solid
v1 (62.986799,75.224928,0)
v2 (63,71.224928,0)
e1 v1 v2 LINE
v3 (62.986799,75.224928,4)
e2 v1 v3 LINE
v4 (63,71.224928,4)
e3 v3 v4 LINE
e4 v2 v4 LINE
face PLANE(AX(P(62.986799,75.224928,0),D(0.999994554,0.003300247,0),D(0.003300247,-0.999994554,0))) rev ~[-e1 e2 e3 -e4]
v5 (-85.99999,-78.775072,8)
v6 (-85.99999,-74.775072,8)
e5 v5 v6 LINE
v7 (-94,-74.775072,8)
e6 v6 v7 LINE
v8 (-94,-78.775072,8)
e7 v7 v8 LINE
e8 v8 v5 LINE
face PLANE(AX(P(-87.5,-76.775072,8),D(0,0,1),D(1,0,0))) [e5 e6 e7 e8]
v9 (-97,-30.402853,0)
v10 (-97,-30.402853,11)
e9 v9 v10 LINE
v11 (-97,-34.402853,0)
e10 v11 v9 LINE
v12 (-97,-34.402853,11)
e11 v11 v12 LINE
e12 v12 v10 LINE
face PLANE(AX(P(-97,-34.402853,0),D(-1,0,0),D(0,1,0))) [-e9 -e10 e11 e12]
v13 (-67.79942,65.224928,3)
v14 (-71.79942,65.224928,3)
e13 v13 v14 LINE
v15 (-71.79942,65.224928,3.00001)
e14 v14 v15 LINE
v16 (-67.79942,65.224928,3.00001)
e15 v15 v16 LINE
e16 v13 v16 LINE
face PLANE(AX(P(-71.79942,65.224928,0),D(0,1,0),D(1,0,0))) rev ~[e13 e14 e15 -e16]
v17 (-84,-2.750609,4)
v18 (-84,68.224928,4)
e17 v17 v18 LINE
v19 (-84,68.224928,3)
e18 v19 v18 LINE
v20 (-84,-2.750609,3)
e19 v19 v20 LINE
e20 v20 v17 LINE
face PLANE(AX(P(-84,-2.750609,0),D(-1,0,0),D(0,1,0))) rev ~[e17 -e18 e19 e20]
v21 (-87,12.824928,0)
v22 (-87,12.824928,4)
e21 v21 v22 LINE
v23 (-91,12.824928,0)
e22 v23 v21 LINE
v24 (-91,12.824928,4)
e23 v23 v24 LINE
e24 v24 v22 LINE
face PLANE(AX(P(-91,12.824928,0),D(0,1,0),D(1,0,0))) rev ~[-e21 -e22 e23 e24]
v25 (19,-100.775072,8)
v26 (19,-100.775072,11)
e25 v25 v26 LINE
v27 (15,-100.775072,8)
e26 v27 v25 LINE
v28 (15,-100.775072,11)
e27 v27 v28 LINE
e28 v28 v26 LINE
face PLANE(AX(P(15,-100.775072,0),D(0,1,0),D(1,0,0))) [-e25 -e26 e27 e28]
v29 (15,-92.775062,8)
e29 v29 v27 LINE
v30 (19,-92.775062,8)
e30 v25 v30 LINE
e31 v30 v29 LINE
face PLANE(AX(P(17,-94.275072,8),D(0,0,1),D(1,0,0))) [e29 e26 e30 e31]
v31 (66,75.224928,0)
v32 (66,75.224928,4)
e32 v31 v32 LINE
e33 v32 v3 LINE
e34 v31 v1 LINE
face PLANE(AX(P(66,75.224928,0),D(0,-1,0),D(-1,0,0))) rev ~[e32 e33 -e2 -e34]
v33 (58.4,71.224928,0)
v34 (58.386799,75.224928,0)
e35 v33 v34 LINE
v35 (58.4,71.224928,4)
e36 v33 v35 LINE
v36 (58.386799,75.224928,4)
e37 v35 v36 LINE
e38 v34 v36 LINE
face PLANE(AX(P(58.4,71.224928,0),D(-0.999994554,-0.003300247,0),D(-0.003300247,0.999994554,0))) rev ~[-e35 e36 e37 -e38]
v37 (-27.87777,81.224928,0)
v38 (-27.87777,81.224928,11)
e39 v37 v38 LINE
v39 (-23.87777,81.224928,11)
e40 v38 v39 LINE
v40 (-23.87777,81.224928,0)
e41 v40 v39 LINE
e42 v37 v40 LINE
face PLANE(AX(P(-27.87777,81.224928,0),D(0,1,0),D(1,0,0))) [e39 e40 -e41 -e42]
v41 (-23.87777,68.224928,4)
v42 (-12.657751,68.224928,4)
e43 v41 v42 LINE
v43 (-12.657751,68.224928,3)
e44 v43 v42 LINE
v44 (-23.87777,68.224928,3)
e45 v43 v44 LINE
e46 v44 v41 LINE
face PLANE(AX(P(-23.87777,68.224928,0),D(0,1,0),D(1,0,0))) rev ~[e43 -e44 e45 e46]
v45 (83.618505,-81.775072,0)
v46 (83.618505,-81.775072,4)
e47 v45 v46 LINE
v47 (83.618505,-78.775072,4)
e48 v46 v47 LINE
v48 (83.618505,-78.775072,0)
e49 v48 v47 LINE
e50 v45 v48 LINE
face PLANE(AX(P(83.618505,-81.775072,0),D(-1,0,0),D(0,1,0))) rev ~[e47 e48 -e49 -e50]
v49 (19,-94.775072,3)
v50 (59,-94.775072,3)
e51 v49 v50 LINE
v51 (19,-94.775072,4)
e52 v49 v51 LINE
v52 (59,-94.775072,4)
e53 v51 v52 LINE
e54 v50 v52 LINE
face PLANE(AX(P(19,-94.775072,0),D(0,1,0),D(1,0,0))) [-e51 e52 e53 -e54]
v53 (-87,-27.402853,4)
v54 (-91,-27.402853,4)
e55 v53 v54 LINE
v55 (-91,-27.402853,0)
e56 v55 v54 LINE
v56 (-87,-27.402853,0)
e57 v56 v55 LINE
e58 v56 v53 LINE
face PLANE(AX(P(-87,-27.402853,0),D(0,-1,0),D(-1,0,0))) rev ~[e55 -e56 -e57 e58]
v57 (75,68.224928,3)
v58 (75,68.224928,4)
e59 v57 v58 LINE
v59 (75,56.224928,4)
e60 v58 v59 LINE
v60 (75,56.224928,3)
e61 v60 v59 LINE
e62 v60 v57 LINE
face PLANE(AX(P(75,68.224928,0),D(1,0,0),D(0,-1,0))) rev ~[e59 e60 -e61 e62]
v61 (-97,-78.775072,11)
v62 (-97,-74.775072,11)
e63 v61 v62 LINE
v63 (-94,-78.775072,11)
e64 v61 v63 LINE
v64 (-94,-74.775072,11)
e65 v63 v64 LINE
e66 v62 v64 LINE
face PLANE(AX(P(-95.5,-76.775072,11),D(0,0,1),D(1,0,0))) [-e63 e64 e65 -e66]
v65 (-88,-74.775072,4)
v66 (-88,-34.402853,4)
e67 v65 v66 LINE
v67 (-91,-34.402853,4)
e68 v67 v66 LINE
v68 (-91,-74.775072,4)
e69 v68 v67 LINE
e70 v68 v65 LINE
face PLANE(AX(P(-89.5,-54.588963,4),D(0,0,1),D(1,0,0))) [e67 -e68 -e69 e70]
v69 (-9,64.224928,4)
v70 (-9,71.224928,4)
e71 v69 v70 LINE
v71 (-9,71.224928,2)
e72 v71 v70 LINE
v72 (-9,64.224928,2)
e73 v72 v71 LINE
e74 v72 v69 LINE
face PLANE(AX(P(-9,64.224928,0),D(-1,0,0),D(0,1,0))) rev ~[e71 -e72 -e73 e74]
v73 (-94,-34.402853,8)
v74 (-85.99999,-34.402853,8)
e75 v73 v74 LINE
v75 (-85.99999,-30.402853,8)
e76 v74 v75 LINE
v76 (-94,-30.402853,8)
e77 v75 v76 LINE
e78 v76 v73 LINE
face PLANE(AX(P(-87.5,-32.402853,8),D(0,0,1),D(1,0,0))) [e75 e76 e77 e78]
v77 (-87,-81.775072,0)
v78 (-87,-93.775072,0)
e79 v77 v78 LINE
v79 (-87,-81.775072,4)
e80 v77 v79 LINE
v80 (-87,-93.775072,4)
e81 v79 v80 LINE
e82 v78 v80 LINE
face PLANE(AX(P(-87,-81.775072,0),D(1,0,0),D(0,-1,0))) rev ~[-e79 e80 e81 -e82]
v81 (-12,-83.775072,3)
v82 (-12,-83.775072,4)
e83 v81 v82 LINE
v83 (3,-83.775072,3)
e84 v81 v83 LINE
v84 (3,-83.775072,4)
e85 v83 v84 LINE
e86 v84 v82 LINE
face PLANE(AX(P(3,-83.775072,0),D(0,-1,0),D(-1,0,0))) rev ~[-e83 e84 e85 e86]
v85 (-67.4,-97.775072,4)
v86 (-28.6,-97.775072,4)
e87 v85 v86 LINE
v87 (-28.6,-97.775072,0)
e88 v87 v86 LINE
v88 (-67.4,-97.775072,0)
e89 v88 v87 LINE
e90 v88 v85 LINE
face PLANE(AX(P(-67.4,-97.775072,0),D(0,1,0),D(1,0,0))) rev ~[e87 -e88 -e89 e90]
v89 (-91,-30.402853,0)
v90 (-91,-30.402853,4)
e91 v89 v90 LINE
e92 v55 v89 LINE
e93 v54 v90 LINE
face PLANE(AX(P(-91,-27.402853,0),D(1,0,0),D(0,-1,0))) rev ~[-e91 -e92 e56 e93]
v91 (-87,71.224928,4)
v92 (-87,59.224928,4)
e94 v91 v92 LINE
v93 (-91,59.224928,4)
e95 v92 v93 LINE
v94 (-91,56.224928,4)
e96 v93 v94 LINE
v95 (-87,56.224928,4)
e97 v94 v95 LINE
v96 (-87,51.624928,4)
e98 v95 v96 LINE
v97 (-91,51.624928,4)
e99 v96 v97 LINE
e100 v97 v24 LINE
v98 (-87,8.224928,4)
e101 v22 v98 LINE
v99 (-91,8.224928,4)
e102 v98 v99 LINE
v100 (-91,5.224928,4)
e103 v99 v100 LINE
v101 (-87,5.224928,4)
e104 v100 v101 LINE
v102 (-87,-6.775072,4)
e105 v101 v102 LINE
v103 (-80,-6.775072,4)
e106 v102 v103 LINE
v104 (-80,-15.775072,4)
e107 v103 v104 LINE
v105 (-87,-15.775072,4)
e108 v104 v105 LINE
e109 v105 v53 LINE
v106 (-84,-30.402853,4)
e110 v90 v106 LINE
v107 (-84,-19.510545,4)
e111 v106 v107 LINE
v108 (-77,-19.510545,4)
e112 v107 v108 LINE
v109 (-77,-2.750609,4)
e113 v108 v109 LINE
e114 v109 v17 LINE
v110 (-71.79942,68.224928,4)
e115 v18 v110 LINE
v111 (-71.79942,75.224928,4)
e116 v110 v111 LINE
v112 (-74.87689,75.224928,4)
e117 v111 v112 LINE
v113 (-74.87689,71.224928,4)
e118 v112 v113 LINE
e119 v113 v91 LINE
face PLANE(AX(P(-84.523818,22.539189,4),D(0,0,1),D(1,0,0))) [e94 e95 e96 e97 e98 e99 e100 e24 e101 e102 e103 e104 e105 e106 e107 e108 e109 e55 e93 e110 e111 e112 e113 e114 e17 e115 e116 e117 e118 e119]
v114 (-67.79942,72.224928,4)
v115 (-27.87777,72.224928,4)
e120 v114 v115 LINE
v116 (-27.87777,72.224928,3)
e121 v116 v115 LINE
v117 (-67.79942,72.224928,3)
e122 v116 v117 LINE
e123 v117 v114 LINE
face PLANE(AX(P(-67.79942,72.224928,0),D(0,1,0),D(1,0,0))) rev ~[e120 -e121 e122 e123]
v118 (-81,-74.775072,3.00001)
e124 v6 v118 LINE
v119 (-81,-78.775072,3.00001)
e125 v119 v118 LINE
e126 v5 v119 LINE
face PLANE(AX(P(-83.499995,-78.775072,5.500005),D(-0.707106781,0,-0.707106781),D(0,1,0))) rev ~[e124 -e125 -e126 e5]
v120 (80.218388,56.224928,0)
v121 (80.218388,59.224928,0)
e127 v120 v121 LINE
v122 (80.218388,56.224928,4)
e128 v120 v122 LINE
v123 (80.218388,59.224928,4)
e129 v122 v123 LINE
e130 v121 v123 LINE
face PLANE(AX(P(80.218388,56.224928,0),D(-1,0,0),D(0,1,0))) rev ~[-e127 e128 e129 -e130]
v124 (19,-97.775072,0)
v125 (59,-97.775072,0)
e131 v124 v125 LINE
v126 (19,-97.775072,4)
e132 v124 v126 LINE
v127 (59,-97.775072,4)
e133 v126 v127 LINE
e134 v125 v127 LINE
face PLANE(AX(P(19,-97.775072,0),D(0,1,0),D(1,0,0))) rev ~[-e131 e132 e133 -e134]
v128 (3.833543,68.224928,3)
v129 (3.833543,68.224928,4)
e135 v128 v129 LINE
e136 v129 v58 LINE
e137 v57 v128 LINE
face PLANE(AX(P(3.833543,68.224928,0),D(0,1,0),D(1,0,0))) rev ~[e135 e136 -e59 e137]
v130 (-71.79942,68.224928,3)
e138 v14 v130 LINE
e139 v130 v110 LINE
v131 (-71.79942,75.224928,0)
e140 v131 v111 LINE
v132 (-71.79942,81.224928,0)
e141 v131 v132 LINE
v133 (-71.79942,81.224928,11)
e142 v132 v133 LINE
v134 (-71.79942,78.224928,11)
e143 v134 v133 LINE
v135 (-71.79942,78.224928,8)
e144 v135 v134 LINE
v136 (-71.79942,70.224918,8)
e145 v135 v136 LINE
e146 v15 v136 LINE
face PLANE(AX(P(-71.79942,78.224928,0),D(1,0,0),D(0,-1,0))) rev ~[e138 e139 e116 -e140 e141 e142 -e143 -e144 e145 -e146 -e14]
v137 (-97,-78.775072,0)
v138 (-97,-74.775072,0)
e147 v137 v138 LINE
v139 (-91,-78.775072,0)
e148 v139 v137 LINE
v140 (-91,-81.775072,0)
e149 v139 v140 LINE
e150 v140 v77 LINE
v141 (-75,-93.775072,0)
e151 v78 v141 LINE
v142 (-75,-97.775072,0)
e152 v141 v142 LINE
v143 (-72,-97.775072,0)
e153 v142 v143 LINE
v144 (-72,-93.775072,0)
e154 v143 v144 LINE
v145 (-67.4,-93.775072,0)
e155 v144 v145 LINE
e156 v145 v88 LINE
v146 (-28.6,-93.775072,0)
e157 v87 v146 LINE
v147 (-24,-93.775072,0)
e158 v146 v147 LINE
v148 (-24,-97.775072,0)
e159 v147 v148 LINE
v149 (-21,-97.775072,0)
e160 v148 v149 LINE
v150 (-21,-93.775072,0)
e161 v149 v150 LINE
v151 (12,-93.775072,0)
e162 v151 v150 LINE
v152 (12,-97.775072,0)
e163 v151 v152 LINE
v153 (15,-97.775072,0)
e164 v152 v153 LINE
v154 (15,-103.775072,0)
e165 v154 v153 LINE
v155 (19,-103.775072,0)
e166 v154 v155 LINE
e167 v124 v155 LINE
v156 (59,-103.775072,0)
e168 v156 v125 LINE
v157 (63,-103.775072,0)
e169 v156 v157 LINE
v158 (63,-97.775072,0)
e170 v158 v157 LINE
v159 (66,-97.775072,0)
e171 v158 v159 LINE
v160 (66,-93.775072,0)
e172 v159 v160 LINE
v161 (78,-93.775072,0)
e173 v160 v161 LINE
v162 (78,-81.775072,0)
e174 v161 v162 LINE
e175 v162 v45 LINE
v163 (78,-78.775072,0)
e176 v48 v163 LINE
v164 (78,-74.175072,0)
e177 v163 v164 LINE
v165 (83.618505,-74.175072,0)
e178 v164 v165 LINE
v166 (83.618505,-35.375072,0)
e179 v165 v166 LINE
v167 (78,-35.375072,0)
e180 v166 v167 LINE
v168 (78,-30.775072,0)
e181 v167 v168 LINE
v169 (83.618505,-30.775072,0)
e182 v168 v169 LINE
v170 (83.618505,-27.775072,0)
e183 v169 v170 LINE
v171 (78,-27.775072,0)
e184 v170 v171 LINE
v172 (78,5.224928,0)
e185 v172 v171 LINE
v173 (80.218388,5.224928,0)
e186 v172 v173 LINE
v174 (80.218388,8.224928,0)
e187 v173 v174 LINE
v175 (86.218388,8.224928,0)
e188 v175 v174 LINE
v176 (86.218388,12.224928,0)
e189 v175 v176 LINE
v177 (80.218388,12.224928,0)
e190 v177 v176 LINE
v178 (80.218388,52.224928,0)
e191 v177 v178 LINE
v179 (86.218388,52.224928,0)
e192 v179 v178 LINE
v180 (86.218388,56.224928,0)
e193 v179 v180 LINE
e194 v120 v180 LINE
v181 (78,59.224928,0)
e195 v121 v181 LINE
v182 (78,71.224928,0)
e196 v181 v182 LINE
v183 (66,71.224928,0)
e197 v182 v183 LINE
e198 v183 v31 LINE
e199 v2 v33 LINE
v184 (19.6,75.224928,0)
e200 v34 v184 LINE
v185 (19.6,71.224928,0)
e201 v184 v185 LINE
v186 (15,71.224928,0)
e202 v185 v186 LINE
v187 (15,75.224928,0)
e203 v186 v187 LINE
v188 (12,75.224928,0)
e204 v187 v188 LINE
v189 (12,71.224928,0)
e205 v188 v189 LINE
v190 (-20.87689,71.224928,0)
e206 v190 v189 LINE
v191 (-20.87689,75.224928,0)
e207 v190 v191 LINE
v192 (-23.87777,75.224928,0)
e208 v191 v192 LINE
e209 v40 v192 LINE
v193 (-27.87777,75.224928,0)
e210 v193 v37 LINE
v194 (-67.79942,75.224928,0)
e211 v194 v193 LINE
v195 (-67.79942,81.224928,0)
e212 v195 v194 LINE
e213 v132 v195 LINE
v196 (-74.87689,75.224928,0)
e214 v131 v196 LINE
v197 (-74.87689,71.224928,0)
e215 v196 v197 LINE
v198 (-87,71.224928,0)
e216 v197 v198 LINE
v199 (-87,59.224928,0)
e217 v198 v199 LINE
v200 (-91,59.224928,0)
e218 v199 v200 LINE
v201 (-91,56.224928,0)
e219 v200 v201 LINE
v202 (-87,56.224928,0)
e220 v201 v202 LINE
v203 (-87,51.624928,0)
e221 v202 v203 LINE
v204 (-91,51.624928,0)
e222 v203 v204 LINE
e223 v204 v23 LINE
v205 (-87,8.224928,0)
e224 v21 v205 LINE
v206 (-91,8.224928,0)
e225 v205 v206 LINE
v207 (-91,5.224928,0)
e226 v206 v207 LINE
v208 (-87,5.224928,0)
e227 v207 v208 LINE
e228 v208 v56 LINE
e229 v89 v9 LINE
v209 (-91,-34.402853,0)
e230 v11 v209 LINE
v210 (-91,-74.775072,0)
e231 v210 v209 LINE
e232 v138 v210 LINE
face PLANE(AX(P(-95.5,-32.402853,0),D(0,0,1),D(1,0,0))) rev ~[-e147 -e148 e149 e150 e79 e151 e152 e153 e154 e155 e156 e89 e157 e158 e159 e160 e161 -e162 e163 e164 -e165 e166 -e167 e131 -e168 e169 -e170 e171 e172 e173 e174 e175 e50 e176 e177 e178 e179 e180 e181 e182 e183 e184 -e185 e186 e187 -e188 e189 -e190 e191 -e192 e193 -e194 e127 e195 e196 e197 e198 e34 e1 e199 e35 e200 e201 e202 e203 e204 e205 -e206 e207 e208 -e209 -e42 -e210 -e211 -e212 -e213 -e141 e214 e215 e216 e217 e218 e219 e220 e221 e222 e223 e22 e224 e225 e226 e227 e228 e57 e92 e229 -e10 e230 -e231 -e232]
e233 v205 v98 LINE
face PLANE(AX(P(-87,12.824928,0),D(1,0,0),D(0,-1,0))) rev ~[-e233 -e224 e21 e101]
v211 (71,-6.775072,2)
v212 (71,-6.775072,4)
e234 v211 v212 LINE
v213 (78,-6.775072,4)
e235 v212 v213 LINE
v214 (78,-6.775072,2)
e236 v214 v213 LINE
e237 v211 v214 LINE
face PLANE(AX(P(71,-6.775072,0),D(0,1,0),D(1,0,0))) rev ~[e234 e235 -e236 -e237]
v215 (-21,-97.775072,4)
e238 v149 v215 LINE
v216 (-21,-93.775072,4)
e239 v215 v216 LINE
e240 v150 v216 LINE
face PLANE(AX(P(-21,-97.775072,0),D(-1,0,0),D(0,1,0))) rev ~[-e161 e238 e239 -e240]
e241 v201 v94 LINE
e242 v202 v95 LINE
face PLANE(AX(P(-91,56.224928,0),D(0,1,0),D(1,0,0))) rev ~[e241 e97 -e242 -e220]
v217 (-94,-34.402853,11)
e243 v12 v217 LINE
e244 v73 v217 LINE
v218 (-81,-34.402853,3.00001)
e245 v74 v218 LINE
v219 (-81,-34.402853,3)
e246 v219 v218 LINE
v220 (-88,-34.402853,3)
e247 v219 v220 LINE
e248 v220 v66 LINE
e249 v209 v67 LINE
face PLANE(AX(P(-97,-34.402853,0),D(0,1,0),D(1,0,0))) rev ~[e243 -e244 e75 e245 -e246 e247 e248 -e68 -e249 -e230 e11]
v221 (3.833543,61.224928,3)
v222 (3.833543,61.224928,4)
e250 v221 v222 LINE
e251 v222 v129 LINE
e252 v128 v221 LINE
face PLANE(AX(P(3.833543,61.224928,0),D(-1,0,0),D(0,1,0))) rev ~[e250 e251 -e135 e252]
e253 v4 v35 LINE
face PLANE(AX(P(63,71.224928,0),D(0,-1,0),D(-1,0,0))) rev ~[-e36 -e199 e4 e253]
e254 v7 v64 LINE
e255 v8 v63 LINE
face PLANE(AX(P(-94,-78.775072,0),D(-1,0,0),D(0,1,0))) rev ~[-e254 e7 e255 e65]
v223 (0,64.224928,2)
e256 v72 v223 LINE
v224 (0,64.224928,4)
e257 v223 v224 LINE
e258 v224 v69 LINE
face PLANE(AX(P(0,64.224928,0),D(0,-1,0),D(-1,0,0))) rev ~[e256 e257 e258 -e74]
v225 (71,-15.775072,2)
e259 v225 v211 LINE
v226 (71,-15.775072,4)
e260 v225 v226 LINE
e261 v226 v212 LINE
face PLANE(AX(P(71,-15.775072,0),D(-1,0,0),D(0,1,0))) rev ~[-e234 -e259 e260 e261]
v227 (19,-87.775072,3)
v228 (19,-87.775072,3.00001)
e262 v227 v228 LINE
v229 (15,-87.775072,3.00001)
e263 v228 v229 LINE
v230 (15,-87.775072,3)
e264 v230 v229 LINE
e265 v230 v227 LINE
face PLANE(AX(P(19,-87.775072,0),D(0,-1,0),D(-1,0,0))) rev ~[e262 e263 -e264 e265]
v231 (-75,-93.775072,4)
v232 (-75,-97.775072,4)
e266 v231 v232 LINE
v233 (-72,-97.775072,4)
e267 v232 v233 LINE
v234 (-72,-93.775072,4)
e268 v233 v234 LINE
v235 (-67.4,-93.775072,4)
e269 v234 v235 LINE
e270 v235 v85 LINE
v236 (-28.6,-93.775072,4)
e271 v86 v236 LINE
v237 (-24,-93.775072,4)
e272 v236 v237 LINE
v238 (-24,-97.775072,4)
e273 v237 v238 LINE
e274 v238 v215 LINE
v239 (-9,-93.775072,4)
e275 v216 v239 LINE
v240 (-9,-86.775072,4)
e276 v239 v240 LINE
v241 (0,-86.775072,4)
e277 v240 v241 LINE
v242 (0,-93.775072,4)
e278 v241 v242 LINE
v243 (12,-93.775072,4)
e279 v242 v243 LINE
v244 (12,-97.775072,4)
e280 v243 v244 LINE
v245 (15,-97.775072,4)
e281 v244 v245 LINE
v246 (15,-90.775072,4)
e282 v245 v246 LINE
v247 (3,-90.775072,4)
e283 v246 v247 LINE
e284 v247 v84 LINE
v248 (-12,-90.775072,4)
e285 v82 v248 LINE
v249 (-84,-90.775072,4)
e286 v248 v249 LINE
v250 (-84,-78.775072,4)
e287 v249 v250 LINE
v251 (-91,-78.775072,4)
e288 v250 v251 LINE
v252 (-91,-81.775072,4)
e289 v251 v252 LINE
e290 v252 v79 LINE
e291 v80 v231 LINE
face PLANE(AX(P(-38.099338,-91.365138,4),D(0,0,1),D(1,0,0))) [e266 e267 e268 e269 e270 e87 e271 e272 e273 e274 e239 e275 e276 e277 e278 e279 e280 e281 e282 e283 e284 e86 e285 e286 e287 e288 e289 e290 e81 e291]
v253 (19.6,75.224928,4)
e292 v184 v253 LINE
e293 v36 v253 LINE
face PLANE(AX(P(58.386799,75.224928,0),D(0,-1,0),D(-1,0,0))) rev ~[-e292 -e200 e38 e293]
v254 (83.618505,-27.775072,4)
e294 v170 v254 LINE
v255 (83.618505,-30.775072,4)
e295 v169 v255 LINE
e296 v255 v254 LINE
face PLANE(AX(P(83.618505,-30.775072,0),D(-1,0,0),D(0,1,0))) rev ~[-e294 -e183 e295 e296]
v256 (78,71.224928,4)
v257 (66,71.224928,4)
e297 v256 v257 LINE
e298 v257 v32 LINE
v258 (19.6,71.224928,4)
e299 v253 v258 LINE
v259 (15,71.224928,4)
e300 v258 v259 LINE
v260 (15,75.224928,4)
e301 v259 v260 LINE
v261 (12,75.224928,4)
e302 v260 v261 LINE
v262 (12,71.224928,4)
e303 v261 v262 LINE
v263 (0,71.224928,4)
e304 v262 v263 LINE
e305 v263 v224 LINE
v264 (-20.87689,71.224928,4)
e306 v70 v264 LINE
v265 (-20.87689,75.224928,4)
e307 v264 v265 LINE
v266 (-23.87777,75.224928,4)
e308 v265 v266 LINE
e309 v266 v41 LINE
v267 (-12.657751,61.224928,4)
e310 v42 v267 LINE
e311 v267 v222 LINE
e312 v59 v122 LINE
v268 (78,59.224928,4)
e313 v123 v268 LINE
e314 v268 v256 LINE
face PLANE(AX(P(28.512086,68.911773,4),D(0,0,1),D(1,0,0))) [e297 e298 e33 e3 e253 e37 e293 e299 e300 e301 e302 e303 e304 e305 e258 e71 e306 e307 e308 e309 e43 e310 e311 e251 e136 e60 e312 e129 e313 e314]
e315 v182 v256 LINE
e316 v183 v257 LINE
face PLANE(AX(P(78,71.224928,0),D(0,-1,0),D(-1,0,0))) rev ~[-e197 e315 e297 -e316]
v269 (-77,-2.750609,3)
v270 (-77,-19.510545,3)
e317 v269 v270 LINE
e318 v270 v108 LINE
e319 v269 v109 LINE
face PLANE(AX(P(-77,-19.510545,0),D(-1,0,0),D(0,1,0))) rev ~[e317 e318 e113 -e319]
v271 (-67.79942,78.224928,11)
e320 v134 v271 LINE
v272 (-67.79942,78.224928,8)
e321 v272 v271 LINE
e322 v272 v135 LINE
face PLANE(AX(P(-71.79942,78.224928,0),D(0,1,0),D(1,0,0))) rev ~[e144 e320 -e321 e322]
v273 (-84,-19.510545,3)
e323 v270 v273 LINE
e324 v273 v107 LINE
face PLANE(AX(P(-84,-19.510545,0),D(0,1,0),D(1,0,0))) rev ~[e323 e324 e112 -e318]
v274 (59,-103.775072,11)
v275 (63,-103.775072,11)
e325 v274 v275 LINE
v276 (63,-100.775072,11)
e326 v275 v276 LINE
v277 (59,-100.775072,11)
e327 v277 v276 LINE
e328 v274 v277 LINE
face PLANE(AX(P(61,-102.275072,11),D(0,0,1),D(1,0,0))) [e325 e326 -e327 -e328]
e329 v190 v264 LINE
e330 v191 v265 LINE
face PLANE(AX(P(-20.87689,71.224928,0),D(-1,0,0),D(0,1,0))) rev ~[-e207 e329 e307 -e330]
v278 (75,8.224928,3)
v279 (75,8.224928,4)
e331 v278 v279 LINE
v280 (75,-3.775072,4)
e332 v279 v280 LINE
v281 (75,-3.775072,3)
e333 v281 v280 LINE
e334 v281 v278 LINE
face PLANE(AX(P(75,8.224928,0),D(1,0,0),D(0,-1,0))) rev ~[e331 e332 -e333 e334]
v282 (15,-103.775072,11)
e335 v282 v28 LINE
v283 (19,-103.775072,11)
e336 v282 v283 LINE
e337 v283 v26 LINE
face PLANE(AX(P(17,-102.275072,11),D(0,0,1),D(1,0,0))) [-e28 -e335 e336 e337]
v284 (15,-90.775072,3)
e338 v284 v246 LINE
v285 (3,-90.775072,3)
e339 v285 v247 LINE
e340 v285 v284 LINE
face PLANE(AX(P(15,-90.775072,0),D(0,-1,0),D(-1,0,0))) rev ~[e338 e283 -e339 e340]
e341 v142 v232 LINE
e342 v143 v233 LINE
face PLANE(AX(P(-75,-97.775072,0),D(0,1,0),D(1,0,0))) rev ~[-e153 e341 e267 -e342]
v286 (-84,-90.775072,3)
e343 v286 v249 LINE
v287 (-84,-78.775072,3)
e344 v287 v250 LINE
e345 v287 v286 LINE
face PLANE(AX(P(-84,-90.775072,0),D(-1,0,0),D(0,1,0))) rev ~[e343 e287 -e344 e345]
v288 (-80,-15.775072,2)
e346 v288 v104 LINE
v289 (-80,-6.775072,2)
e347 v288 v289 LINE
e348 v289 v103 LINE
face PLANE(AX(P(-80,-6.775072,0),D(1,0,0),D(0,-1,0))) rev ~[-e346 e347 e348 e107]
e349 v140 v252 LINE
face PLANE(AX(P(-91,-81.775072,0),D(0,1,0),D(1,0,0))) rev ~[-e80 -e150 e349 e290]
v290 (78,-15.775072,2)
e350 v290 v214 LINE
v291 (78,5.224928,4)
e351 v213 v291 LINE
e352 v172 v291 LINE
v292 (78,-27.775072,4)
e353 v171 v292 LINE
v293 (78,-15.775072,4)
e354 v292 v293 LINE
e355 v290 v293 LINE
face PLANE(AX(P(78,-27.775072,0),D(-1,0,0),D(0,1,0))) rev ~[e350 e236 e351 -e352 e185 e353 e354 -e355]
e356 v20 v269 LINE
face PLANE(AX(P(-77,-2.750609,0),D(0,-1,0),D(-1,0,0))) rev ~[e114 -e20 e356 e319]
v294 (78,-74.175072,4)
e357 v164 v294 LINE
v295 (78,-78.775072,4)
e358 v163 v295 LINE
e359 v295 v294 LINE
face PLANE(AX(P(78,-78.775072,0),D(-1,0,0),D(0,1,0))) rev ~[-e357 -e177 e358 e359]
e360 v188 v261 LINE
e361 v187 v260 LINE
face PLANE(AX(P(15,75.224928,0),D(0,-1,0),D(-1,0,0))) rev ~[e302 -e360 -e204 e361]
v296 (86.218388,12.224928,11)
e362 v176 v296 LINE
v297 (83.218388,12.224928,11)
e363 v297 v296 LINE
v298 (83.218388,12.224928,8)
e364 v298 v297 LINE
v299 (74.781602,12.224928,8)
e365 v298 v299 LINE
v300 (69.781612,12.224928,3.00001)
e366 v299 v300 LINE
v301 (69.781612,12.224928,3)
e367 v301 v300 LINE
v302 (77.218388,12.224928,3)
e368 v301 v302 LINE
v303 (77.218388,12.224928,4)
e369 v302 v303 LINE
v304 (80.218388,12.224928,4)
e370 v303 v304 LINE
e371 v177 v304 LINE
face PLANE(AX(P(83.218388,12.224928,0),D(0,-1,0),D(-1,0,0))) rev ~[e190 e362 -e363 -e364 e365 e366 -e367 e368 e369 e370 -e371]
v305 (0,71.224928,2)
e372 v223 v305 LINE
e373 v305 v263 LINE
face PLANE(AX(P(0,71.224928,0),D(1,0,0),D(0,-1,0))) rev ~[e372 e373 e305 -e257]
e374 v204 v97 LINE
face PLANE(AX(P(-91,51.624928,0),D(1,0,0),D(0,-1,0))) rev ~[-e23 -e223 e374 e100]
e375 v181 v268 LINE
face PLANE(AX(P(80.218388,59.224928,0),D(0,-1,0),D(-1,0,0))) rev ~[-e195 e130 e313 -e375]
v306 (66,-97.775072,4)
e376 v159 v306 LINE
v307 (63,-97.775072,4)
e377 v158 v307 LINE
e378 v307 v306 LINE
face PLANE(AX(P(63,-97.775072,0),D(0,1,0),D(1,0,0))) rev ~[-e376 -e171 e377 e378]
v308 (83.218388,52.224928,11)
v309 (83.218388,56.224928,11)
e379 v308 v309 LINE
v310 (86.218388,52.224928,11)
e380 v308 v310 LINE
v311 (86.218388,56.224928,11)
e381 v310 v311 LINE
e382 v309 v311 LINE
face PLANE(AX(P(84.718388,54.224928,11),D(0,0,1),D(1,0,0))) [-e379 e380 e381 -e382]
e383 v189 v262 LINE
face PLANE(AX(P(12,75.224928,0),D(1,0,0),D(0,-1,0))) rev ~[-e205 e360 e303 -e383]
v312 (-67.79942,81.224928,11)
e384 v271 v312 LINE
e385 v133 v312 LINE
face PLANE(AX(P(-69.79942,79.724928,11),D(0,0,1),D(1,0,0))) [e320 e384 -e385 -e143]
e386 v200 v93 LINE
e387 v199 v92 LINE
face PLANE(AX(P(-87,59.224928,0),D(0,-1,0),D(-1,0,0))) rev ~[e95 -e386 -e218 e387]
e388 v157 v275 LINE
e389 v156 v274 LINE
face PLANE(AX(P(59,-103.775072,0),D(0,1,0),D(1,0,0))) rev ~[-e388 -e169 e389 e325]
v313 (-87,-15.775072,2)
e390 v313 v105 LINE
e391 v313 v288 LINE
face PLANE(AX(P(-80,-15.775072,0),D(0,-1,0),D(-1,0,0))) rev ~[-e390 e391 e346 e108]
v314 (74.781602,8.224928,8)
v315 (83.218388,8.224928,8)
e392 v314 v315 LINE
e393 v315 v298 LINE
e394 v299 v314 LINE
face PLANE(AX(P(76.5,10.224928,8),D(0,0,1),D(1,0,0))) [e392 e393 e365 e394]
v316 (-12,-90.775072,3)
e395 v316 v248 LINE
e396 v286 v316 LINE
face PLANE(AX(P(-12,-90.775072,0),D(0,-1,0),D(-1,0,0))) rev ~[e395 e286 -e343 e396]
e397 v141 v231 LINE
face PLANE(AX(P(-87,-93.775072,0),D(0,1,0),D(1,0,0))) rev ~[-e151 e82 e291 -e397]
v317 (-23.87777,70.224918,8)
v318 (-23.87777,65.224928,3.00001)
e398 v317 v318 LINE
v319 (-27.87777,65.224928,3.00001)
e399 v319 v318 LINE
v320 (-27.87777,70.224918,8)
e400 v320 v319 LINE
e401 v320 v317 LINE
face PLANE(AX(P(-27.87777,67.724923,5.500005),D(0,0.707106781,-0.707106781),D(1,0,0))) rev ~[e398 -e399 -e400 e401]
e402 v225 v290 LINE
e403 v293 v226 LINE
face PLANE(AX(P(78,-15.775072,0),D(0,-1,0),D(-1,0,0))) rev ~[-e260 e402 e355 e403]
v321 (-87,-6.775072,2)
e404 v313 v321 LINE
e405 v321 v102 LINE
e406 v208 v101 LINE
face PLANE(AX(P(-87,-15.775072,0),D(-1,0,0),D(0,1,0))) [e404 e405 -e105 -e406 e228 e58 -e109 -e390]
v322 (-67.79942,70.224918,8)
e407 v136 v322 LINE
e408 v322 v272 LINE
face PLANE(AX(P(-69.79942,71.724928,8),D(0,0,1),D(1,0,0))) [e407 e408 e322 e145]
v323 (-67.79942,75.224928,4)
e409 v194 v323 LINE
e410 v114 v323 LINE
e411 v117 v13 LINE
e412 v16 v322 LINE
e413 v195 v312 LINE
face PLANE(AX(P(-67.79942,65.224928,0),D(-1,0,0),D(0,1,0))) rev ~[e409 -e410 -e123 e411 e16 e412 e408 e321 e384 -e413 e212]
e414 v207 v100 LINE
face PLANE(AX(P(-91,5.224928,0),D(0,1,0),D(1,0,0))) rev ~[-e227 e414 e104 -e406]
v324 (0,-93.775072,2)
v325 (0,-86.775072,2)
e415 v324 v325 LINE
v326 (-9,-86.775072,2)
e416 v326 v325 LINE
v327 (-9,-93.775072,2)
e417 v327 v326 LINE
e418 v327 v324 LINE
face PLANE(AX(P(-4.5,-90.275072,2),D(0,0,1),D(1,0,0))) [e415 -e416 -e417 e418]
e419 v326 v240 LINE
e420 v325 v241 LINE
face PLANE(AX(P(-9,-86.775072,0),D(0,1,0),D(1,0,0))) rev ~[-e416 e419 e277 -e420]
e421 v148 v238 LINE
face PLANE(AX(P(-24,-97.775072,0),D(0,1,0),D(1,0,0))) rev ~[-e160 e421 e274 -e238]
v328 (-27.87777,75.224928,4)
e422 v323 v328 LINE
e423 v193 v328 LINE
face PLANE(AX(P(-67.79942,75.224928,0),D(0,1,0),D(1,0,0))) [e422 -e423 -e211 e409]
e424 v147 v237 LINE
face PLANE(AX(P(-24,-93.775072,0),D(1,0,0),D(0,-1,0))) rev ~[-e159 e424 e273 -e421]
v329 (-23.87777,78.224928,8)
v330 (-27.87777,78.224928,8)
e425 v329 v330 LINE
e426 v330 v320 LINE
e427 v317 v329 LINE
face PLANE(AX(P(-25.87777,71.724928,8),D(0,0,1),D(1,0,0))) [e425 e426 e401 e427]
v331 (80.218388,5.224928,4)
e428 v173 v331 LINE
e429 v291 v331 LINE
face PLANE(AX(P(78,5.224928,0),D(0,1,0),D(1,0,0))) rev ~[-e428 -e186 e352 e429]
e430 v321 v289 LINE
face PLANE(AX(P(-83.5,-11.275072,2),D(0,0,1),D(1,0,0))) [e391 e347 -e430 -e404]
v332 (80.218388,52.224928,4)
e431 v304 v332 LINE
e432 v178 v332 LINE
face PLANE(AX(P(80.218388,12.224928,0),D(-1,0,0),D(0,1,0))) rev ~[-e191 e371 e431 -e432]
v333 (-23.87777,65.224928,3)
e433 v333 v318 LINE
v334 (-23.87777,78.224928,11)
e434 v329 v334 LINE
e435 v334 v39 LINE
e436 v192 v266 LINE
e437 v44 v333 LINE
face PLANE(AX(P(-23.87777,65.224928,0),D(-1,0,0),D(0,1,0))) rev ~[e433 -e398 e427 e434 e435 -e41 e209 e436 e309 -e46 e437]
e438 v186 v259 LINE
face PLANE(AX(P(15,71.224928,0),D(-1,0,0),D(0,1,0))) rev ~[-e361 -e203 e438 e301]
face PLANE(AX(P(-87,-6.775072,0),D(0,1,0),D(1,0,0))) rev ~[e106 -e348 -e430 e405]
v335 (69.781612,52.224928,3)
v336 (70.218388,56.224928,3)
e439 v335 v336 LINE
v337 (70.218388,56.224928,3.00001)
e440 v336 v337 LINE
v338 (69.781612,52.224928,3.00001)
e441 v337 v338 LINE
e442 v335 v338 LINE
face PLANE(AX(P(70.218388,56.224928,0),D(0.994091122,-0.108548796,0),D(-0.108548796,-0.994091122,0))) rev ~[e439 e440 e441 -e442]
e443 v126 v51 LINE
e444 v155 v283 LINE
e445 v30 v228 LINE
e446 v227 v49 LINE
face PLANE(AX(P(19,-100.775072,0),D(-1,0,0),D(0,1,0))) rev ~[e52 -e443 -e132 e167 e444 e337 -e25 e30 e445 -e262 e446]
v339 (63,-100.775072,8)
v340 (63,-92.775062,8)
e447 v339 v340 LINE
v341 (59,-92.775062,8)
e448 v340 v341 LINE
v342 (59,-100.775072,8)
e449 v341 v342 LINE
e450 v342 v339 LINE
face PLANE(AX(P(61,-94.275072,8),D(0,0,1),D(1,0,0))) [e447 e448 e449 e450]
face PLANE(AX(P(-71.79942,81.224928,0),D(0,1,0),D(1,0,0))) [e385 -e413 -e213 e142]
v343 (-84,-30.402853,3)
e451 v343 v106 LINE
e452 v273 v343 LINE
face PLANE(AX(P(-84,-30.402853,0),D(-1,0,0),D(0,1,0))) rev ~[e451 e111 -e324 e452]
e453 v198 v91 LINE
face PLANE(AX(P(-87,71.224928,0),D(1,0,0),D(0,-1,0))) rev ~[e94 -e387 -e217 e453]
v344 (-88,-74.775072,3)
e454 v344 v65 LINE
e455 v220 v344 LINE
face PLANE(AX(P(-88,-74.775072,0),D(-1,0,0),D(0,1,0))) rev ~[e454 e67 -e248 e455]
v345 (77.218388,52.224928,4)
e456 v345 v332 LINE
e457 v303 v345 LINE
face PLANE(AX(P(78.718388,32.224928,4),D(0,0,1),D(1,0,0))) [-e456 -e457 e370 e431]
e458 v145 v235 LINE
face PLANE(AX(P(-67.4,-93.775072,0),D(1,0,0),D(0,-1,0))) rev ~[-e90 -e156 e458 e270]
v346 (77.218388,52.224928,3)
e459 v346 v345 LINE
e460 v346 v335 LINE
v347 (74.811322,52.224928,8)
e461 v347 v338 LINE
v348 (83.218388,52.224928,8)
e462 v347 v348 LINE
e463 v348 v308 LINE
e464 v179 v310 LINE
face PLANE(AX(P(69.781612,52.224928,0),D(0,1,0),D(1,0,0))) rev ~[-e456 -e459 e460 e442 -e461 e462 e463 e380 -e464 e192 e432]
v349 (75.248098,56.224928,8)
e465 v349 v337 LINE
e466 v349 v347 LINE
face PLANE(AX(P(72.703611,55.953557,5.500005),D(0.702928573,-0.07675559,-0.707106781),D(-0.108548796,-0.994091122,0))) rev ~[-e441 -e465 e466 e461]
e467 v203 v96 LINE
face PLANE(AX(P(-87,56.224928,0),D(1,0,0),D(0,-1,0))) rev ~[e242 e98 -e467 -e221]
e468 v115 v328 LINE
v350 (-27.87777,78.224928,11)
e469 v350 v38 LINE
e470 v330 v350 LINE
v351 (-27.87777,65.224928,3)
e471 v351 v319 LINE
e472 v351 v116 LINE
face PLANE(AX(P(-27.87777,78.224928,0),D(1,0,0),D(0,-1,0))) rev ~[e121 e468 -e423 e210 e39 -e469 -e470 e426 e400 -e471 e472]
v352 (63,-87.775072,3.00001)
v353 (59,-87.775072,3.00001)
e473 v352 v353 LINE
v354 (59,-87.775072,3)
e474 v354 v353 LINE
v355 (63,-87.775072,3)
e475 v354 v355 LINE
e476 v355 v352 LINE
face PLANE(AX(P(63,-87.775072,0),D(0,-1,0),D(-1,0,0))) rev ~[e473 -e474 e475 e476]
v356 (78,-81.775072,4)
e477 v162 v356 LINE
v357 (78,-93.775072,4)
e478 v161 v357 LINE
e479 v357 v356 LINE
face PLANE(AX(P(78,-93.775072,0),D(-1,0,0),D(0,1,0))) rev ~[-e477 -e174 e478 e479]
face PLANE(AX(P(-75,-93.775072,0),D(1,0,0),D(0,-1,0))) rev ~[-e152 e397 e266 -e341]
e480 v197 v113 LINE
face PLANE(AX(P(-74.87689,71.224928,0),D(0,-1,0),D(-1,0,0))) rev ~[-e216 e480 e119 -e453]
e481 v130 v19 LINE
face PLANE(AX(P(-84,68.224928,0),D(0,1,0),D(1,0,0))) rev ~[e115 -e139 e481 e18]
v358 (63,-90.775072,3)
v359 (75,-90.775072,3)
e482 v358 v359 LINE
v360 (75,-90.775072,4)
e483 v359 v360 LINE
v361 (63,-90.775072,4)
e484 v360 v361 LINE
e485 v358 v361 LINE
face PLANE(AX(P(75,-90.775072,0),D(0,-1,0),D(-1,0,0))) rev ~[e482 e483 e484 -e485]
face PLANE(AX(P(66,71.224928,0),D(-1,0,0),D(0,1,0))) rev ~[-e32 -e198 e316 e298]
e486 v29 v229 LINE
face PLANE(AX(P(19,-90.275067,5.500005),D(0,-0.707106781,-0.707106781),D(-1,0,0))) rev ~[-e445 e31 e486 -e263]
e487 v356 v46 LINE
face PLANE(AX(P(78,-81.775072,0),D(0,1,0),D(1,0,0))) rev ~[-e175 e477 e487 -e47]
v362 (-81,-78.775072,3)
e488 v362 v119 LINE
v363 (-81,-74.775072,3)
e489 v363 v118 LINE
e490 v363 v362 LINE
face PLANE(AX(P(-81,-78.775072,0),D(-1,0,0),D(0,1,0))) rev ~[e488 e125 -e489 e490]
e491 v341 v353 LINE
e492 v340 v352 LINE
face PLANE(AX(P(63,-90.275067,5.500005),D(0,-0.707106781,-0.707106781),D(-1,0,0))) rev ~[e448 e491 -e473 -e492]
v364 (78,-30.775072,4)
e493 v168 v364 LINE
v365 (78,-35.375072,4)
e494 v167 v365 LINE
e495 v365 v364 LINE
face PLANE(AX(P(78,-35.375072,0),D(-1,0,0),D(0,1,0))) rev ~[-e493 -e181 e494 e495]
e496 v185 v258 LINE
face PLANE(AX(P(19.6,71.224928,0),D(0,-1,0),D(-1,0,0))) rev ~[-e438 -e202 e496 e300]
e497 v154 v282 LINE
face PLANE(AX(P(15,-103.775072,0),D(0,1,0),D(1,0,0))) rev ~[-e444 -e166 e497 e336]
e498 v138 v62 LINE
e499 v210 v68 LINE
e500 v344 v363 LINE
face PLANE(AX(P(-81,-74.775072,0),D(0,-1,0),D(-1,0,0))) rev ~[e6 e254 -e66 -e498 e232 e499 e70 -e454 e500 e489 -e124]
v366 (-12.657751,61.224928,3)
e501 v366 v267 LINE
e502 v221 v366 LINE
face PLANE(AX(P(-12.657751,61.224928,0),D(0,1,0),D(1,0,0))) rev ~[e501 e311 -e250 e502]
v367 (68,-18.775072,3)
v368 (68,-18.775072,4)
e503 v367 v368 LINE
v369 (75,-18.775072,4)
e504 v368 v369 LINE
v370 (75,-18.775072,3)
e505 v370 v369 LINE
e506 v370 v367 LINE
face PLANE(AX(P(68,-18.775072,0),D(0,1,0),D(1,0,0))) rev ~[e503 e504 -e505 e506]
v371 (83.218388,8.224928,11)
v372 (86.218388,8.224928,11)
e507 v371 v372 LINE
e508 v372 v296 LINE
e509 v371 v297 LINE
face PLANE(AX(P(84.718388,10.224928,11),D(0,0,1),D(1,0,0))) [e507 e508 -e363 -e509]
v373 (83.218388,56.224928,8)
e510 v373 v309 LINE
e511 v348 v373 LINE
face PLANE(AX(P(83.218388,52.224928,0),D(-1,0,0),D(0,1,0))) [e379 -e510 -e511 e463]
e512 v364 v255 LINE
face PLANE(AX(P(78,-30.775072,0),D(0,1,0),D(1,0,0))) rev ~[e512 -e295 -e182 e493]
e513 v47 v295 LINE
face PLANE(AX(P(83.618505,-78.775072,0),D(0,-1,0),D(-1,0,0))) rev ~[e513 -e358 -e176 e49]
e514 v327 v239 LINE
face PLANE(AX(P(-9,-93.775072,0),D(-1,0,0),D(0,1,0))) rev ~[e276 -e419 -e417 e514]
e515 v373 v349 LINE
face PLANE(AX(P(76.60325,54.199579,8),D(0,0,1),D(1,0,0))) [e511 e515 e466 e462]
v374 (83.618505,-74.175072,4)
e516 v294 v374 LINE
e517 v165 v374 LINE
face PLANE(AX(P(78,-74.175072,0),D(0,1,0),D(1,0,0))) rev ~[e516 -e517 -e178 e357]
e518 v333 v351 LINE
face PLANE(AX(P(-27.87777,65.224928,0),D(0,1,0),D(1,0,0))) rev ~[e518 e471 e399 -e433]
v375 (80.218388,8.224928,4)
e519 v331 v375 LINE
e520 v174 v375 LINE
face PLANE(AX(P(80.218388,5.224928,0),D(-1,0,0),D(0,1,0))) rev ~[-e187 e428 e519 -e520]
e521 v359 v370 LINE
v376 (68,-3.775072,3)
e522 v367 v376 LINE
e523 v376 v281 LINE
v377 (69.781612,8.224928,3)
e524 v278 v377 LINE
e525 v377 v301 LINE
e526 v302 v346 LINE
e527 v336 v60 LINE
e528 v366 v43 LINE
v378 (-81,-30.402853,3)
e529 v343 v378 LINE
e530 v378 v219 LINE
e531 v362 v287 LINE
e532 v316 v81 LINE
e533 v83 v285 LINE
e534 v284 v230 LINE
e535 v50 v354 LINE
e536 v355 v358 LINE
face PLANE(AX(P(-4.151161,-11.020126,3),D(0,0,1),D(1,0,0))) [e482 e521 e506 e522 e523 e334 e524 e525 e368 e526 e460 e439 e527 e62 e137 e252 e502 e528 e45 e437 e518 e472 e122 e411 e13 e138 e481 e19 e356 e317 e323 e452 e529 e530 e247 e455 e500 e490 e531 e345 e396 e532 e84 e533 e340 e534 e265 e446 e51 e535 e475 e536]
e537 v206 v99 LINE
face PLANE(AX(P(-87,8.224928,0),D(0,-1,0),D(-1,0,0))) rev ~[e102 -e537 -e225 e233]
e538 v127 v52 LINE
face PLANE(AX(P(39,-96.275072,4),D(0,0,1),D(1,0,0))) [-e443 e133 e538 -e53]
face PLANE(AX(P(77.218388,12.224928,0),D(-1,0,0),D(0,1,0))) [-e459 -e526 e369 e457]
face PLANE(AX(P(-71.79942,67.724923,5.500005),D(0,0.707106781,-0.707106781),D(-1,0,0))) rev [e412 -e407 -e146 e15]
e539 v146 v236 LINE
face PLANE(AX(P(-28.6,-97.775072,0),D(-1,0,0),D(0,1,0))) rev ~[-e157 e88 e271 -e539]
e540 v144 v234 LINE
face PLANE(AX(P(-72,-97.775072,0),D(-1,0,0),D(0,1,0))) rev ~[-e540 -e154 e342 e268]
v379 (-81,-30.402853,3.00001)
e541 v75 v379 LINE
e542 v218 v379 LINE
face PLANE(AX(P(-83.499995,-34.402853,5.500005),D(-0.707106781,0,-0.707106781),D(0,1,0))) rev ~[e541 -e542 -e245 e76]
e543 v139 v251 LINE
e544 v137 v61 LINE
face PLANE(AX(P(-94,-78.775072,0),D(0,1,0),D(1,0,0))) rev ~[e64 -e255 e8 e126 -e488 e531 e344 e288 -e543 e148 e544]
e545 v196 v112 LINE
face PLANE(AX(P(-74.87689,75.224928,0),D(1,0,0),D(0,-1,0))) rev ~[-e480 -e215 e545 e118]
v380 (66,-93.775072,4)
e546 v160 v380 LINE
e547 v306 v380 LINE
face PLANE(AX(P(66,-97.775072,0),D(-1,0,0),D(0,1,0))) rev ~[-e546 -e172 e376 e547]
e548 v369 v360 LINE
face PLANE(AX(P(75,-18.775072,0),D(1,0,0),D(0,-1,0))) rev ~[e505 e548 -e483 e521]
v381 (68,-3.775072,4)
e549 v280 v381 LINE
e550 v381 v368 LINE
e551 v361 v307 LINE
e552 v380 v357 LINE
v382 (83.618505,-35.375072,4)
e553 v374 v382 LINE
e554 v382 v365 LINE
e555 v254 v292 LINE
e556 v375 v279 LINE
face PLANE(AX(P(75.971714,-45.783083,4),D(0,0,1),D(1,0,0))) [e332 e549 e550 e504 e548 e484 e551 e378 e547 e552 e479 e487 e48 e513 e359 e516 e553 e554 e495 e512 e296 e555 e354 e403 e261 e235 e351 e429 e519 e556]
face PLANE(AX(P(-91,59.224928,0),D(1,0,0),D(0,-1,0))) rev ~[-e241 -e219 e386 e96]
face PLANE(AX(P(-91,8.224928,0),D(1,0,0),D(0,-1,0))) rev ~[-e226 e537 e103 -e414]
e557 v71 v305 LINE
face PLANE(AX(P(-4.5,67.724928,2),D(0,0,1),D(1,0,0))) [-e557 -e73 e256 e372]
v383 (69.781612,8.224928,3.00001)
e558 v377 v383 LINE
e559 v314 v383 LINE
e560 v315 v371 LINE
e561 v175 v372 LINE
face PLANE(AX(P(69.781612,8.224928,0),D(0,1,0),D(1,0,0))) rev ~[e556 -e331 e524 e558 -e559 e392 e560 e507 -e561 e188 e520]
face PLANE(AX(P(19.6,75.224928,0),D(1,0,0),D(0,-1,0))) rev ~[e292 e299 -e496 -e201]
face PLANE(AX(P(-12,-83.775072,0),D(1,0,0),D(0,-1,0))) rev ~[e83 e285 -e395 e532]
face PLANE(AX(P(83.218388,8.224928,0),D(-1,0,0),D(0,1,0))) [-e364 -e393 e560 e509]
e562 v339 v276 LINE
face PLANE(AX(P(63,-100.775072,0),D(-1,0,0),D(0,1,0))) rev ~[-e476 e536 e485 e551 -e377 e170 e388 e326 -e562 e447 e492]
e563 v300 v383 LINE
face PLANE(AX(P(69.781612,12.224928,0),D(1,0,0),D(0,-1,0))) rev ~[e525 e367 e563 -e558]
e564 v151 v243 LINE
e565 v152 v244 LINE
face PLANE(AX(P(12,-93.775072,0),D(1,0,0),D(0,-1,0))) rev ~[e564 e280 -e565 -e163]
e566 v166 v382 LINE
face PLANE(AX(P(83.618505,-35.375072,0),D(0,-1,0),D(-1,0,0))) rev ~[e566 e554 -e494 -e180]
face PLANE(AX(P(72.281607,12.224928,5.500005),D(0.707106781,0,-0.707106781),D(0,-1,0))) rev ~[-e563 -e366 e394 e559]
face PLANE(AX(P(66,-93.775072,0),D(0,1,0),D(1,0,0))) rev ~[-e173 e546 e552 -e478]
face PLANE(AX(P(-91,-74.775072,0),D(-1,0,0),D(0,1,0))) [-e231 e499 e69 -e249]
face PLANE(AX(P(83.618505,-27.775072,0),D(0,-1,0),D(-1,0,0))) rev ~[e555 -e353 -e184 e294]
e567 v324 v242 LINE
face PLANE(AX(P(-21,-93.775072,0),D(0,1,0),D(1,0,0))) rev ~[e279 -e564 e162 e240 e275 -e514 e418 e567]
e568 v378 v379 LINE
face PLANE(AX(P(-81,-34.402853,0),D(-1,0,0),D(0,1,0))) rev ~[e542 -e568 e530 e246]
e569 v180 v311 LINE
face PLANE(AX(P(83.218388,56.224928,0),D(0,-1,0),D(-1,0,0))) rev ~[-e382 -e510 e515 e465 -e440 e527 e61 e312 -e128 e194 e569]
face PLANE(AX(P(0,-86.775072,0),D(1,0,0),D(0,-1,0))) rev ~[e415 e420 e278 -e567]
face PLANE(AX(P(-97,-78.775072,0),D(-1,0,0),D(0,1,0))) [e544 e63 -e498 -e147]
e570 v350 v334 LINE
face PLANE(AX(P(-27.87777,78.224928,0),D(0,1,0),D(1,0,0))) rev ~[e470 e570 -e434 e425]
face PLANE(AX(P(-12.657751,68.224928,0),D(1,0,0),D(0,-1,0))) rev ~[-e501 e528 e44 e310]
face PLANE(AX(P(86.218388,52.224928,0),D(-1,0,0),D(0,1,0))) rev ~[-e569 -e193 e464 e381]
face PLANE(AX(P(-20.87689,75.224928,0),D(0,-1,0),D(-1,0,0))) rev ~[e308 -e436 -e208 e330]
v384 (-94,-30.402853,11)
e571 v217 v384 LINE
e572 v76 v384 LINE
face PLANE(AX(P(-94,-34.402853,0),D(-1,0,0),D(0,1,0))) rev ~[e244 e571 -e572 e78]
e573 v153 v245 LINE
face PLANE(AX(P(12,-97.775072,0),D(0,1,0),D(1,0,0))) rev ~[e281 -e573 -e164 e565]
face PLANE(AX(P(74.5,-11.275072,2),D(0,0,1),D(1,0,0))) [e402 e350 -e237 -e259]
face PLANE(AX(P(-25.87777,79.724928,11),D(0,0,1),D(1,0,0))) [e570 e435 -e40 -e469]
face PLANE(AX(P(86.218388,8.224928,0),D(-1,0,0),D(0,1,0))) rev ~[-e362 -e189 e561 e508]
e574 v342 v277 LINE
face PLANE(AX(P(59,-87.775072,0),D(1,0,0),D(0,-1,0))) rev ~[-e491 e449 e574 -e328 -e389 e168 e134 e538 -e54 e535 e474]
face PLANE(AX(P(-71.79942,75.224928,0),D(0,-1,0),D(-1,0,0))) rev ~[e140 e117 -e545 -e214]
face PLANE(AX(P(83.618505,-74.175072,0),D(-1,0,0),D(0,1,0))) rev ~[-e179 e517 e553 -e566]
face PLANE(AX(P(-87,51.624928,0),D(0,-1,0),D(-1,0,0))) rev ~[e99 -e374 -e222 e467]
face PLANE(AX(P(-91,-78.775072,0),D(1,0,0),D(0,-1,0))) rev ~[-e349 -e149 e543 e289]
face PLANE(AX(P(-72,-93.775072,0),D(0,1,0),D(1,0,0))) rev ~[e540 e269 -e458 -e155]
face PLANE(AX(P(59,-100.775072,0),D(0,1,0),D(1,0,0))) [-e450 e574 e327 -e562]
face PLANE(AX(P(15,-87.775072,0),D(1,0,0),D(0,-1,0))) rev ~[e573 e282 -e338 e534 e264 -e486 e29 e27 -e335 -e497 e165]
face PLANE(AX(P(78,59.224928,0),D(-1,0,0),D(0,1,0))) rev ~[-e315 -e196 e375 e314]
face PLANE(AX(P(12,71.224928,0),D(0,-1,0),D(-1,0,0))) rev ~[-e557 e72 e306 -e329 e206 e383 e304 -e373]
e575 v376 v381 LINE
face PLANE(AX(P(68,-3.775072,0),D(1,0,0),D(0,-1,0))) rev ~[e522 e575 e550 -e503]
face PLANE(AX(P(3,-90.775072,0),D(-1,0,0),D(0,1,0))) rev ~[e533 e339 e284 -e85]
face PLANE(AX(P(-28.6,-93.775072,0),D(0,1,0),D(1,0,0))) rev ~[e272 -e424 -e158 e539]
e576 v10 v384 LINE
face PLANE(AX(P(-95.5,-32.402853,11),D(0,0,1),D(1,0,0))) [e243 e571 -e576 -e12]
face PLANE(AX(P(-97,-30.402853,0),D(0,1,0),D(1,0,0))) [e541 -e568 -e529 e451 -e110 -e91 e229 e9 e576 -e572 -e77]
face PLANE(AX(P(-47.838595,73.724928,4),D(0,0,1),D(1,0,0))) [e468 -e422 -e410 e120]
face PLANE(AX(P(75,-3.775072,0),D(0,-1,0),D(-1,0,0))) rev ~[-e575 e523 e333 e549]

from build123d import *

# Parameters (mm, degrees)
F1_DEPTH = 3
F0_W     = 39.9216501117
F0_H     = 3
F0_W_2   = 3
F0_H_2   = 40
F0_W_3   = 40
F0_H_3   = 40.3722185198
F2_DEPTH = 4
F0_W_4   = 7
F0_H_4   = 9
F0_W_5   = 9
F0_H_5   = 7
F3_DEPTH = 2
F4_DEPTH = 8
F0_H_6   = 4
F0_W_6   = 4
F5_DEPTH = 11
F6_SIZE  = 4.99999


# Not quite as in the source:
# - a fillet or chamfer is up to 0.001 mm smaller than in the source, because OpenCascade refuses the exact size


with BuildPart() as f1:
    # F0 (on Top) → F1 (new body)
    with BuildSketch(Plane.XY):
        Polygon((-71.7994198203, 65.224928081), (-71.7994198203, 68.224928081), (-84, 68.224928081), (-84, -2.7506086044), (-77, -2.7506086044), (-77, -19.5105448365), (-84, -19.5105448365), (-84, -30.4028533991), (-81, -30.4028533991), (-81, -34.4028533991), (-88, -34.4028533991), (-88, -74.775071919), (-81, -74.775071919), (-81, -78.775071919), (-84, -78.775071919), (-84, -90.775071919), (-12, -90.775071919), (-12, -83.775071919), (3, -83.775071919), (3, -90.775071919), (15, -90.775071919), (15, -87.775071919), (19, -87.775071919), (19, -94.775071919), (59, -94.775071919), (59, -87.775071919), (63, -87.775071919), (63, -90.775071919), (75, -90.775071919), (75, -18.775071919), (68.6397999525, -18.775071919), (68, -18.775071919), (68, -3.775071919), (75, -3.775071919), (75, 8.224928081), (69.781611979, 8.224928081), (69.781611979, 12.224928081), (77.218388021, 12.224928081), (77.218388021, 52.224928081), (69.781611979, 52.224928081), (70.218388021, 56.224928081), (75, 56.224928081), (75, 68.224928081), (3.8335430436, 68.224928081), (3.8335430436, 61.224928081), (-12.6577513292, 61.224928081), (-12.6577513292, 68.224928081), (-23.8777697086, 68.224928081), (-23.8777697086, 65.224928081), (-27.8777697086, 65.224928081), (-27.8777697086, 72.224928081), (-67.7994198203, 72.224928081), (-67.7994198203, 65.224928081), align=None)
    extrude(amount=F1_DEPTH)

    # F0 (on Top) → F2 (join)
    with BuildSketch(Plane.XY):
        Polygon((-74.8768895864, 71.224928081), (-87, 71.224928081), (-87, 59.224928081), (-91, 59.224928081), (-91, 56.224928081), (-87, 56.224928081), (-87, 51.624928081), (-91, 51.624928081), (-91, 12.824928081), (-87, 12.824928081), (-87, 8.224928081), (-91, 8.224928081), (-91, 5.224928081), (-87, 5.224928081), (-87, -6.775071919), (-80, -6.775071919), (-80, -15.775071919), (-87, -15.775071919), (-87, -27.4028533991), (-91, -27.4028533991), (-91, -30.4028533991), (-84, -30.4028533991), (-84, -19.5105448365), (-77, -19.5105448365), (-77, -2.7506086044), (-84, -2.7506086044), (-84, 68.224928081), (-71.7994198203, 68.224928081), (-71.7994198203, 75.224928081), (-74.8768895864, 75.224928081), align=None)
        with Locations((-47.8385947645, 73.724928081)):
            Rectangle(F0_W, F0_H)
        Polygon((-20.8768895864, 75.224928081), (-23.8777697086, 75.224928081), (-23.8777697086, 68.224928081), (-12.6577513292, 68.224928081), (-12.6577513292, 61.224928081), (3.8335430436, 61.224928081), (3.8335430436, 68.224928081), (75, 68.224928081), (75, 56.224928081), (80.218388021, 56.224928081), (80.218388021, 59.224928081), (78, 59.224928081), (78, 71.224928081), (66, 71.224928081), (66, 75.224928081), (62.9867989421, 75.224928081), (63, 71.224928081), (58.4, 71.224928081), (58.3867989421, 75.224928081), (19.6, 75.224928081), (19.6, 71.224928081), (15, 71.224928081), (15, 75.224928081), (12, 75.224928081), (12, 71.224928081), (0, 71.224928081), (0, 64.224928081), (-9, 64.224928081), (-9, 71.224928081), (-20.8768895864, 71.224928081), align=None)
        with Locations((78.718388021, 32.224928081)):
            Rectangle(F0_W_2, F0_H_2)
        Polygon((79.781611979, 8.224928081), (75, 8.224928081), (75, -3.775071919), (68, -3.775071919), (68, -18.775071919), (68.6397999525, -18.775071919), (75, -18.775071919), (75, -90.775071919), (63, -90.775071919), (63, -97.775071919), (66, -97.775071919), (66, -93.775071919), (78, -93.775071919), (78, -81.775071919), (83.6185051799, -81.775071919), (83.6185051799, -78.775071919), (78, -78.775071919), (78, -74.175071919), (83.6185051799, -74.175071919), (83.6185051799, -35.375071919), (78, -35.375071919), (78, -30.775071919), (83.6185051799, -30.775071919), (83.6185051799, -27.775071919), (78, -27.775071919), (78, -15.775071919), (71, -15.775071919), (71, -6.775071919), (78, -6.775071919), (78, 5.224928081), (80.218388021, 5.224928081), (80.218388021, 8.224928081), align=None)
        with Locations((39, -96.275071919)):
            Rectangle(F0_W_3, F0_H)
        Polygon((-84, -90.775071919), (-84, -78.775071919), (-91, -78.775071919), (-91, -81.775071919), (-87, -81.775071919), (-87, -93.775071919), (-75, -93.775071919), (-75, -97.775071919), (-72, -97.775071919), (-72, -93.775071919), (-67.4, -93.775071919), (-67.4, -97.775071919), (-28.6, -97.775071919), (-28.6, -93.775071919), (-24, -93.775071919), (-24, -97.775071919), (-21, -97.775071919), (-21, -93.775071919), (-9, -93.775071919), (-9, -86.775071919), (0, -86.775071919), (0, -93.775071919), (12, -93.775071919), (12, -97.775071919), (15, -97.775071919), (15, -97.4028533991), (15, -90.775071919), (3, -90.775071919), (3, -83.775071919), (-12, -83.775071919), (-12, -90.775071919), align=None)
        with Locations((-89.5, -54.5889626591)):
            Rectangle(F0_W_2, F0_H_3)
    extrude(amount=F2_DEPTH)

    # F0 (on Top) → F3 (join)
    with BuildSketch(Plane.XY):
        with Locations((-83.5, -11.275071919)):
            Rectangle(F0_W_4, F0_H_4)
        with Locations((-4.5, 67.724928081)):
            Rectangle(F0_W_5, F0_H_5)
        with Locations((74.5, -11.275071919)):
            Rectangle(F0_W_4, F0_H_4)
        with Locations((-4.5, -90.275071919)):
            Rectangle(F0_W_5, F0_H_5)
    extrude(amount=F3_DEPTH)

    # F0 (on Top) → F4 (join)
    with BuildSketch(Plane.XY):
        Polygon((-71.7994198203, 78.224928081), (-71.7994198203, 75.224928081), (-71.7994198203, 68.224928081), (-71.7994198203, 65.224928081), (-67.7994198203, 65.224928081), (-67.7994198203, 72.224928081), (-67.7994198203, 75.224928081), (-67.7994198203, 78.224928081), align=None)
        Polygon((-27.8777697086, 78.224928081), (-27.8777697086, 75.224928081), (-27.8777697086, 72.224928081), (-27.8777697086, 65.224928081), (-23.8777697086, 65.224928081), (-23.8777697086, 68.224928081), (-23.8777697086, 75.224928081), (-23.8777697086, 78.224928081), align=None)
        Polygon((80.218388021, 56.224928081), (75, 56.224928081), (70.218388021, 56.224928081), (69.781611979, 52.224928081), (77.218388021, 52.224928081), (80.218388021, 52.224928081), (83.218388021, 52.224928081), (83.218388021, 56.224928081), align=None)
        Polygon((80.218388021, 12.224928081), (77.218388021, 12.224928081), (69.781611979, 12.224928081), (69.781611979, 8.224928081), (75, 8.224928081), (79.781611979, 8.224928081), (80.218388021, 8.224928081), (83.218388021, 8.224928081), (83.218388021, 12.224928081), align=None)
        Polygon((59, -87.775071919), (59, -94.775071919), (59, -97.775071919), (59, -100.775071919), (63, -100.775071919), (63, -97.775071919), (63, -90.775071919), (63, -87.775071919), align=None)
        Polygon((15, -87.775071919), (15, -90.775071919), (15, -97.4028533991), (15, -97.775071919), (15, -100.775071919), (19, -100.775071919), (19, -97.775071919), (19, -94.775071919), (19, -87.775071919), align=None)
        Polygon((-81, -30.4028533991), (-84, -30.4028533991), (-91, -30.4028533991), (-94, -30.4028533991), (-94, -34.4028533991), (-91, -34.4028533991), (-88, -34.4028533991), (-81, -34.4028533991), align=None)
        Polygon((-81, -74.775071919), (-88, -74.775071919), (-91, -74.775071919), (-91.2415088892, -74.775071919), (-94, -74.775071919), (-94, -78.775071919), (-91, -78.775071919), (-84, -78.775071919), (-81, -78.775071919), align=None)
    extrude(amount=F4_DEPTH)

    # F0 (on Top) → F5 (join)
    with BuildSketch(Plane.XY):
        with Locations((-95.5, -32.4028533991)):
            Rectangle(F0_W_2, F0_H_6)
        with Locations((-95.5, -76.775071919)):
            Rectangle(F0_W_2, F0_H_6)
        with Locations((17, -102.275071919)):
            Rectangle(F0_W_6, F0_H)
        with Locations((61, -102.275071919)):
            Rectangle(F0_W_6, F0_H)
        with Locations((84.718388021, 10.224928081)):
            Rectangle(F0_W_2, F0_H_6)
        with Locations((84.718388021, 54.224928081)):
            Rectangle(F0_W_2, F0_H_6)
        with Locations((-25.8777697086, 79.724928081)):
            Rectangle(F0_W_6, F0_H)
        with Locations((-69.7994198203, 79.724928081)):
            Rectangle(F0_W_6, F0_H)
    extrude(amount=F5_DEPTH)

    # F6 (size 5 in the source; OpenCascade refuses exactly that, so slightly less here)
    f6_edges = [f1.edges().sort_by_distance(p)[0] for p in [
        (-69.79942, 65.224928, 8),
        (-25.87777, 65.224928, 8),
        (70, 54.224928, 8),
        (69.781612, 10.224928, 8),
        (-81, -76.775072, 8),
        (-81, -32.402853, 8),
        (61, -87.775072, 8),
        (17, -87.775072, 8),
    ]]
    chamfer(f6_edges, length=F6_SIZE)


solid = f1.part
